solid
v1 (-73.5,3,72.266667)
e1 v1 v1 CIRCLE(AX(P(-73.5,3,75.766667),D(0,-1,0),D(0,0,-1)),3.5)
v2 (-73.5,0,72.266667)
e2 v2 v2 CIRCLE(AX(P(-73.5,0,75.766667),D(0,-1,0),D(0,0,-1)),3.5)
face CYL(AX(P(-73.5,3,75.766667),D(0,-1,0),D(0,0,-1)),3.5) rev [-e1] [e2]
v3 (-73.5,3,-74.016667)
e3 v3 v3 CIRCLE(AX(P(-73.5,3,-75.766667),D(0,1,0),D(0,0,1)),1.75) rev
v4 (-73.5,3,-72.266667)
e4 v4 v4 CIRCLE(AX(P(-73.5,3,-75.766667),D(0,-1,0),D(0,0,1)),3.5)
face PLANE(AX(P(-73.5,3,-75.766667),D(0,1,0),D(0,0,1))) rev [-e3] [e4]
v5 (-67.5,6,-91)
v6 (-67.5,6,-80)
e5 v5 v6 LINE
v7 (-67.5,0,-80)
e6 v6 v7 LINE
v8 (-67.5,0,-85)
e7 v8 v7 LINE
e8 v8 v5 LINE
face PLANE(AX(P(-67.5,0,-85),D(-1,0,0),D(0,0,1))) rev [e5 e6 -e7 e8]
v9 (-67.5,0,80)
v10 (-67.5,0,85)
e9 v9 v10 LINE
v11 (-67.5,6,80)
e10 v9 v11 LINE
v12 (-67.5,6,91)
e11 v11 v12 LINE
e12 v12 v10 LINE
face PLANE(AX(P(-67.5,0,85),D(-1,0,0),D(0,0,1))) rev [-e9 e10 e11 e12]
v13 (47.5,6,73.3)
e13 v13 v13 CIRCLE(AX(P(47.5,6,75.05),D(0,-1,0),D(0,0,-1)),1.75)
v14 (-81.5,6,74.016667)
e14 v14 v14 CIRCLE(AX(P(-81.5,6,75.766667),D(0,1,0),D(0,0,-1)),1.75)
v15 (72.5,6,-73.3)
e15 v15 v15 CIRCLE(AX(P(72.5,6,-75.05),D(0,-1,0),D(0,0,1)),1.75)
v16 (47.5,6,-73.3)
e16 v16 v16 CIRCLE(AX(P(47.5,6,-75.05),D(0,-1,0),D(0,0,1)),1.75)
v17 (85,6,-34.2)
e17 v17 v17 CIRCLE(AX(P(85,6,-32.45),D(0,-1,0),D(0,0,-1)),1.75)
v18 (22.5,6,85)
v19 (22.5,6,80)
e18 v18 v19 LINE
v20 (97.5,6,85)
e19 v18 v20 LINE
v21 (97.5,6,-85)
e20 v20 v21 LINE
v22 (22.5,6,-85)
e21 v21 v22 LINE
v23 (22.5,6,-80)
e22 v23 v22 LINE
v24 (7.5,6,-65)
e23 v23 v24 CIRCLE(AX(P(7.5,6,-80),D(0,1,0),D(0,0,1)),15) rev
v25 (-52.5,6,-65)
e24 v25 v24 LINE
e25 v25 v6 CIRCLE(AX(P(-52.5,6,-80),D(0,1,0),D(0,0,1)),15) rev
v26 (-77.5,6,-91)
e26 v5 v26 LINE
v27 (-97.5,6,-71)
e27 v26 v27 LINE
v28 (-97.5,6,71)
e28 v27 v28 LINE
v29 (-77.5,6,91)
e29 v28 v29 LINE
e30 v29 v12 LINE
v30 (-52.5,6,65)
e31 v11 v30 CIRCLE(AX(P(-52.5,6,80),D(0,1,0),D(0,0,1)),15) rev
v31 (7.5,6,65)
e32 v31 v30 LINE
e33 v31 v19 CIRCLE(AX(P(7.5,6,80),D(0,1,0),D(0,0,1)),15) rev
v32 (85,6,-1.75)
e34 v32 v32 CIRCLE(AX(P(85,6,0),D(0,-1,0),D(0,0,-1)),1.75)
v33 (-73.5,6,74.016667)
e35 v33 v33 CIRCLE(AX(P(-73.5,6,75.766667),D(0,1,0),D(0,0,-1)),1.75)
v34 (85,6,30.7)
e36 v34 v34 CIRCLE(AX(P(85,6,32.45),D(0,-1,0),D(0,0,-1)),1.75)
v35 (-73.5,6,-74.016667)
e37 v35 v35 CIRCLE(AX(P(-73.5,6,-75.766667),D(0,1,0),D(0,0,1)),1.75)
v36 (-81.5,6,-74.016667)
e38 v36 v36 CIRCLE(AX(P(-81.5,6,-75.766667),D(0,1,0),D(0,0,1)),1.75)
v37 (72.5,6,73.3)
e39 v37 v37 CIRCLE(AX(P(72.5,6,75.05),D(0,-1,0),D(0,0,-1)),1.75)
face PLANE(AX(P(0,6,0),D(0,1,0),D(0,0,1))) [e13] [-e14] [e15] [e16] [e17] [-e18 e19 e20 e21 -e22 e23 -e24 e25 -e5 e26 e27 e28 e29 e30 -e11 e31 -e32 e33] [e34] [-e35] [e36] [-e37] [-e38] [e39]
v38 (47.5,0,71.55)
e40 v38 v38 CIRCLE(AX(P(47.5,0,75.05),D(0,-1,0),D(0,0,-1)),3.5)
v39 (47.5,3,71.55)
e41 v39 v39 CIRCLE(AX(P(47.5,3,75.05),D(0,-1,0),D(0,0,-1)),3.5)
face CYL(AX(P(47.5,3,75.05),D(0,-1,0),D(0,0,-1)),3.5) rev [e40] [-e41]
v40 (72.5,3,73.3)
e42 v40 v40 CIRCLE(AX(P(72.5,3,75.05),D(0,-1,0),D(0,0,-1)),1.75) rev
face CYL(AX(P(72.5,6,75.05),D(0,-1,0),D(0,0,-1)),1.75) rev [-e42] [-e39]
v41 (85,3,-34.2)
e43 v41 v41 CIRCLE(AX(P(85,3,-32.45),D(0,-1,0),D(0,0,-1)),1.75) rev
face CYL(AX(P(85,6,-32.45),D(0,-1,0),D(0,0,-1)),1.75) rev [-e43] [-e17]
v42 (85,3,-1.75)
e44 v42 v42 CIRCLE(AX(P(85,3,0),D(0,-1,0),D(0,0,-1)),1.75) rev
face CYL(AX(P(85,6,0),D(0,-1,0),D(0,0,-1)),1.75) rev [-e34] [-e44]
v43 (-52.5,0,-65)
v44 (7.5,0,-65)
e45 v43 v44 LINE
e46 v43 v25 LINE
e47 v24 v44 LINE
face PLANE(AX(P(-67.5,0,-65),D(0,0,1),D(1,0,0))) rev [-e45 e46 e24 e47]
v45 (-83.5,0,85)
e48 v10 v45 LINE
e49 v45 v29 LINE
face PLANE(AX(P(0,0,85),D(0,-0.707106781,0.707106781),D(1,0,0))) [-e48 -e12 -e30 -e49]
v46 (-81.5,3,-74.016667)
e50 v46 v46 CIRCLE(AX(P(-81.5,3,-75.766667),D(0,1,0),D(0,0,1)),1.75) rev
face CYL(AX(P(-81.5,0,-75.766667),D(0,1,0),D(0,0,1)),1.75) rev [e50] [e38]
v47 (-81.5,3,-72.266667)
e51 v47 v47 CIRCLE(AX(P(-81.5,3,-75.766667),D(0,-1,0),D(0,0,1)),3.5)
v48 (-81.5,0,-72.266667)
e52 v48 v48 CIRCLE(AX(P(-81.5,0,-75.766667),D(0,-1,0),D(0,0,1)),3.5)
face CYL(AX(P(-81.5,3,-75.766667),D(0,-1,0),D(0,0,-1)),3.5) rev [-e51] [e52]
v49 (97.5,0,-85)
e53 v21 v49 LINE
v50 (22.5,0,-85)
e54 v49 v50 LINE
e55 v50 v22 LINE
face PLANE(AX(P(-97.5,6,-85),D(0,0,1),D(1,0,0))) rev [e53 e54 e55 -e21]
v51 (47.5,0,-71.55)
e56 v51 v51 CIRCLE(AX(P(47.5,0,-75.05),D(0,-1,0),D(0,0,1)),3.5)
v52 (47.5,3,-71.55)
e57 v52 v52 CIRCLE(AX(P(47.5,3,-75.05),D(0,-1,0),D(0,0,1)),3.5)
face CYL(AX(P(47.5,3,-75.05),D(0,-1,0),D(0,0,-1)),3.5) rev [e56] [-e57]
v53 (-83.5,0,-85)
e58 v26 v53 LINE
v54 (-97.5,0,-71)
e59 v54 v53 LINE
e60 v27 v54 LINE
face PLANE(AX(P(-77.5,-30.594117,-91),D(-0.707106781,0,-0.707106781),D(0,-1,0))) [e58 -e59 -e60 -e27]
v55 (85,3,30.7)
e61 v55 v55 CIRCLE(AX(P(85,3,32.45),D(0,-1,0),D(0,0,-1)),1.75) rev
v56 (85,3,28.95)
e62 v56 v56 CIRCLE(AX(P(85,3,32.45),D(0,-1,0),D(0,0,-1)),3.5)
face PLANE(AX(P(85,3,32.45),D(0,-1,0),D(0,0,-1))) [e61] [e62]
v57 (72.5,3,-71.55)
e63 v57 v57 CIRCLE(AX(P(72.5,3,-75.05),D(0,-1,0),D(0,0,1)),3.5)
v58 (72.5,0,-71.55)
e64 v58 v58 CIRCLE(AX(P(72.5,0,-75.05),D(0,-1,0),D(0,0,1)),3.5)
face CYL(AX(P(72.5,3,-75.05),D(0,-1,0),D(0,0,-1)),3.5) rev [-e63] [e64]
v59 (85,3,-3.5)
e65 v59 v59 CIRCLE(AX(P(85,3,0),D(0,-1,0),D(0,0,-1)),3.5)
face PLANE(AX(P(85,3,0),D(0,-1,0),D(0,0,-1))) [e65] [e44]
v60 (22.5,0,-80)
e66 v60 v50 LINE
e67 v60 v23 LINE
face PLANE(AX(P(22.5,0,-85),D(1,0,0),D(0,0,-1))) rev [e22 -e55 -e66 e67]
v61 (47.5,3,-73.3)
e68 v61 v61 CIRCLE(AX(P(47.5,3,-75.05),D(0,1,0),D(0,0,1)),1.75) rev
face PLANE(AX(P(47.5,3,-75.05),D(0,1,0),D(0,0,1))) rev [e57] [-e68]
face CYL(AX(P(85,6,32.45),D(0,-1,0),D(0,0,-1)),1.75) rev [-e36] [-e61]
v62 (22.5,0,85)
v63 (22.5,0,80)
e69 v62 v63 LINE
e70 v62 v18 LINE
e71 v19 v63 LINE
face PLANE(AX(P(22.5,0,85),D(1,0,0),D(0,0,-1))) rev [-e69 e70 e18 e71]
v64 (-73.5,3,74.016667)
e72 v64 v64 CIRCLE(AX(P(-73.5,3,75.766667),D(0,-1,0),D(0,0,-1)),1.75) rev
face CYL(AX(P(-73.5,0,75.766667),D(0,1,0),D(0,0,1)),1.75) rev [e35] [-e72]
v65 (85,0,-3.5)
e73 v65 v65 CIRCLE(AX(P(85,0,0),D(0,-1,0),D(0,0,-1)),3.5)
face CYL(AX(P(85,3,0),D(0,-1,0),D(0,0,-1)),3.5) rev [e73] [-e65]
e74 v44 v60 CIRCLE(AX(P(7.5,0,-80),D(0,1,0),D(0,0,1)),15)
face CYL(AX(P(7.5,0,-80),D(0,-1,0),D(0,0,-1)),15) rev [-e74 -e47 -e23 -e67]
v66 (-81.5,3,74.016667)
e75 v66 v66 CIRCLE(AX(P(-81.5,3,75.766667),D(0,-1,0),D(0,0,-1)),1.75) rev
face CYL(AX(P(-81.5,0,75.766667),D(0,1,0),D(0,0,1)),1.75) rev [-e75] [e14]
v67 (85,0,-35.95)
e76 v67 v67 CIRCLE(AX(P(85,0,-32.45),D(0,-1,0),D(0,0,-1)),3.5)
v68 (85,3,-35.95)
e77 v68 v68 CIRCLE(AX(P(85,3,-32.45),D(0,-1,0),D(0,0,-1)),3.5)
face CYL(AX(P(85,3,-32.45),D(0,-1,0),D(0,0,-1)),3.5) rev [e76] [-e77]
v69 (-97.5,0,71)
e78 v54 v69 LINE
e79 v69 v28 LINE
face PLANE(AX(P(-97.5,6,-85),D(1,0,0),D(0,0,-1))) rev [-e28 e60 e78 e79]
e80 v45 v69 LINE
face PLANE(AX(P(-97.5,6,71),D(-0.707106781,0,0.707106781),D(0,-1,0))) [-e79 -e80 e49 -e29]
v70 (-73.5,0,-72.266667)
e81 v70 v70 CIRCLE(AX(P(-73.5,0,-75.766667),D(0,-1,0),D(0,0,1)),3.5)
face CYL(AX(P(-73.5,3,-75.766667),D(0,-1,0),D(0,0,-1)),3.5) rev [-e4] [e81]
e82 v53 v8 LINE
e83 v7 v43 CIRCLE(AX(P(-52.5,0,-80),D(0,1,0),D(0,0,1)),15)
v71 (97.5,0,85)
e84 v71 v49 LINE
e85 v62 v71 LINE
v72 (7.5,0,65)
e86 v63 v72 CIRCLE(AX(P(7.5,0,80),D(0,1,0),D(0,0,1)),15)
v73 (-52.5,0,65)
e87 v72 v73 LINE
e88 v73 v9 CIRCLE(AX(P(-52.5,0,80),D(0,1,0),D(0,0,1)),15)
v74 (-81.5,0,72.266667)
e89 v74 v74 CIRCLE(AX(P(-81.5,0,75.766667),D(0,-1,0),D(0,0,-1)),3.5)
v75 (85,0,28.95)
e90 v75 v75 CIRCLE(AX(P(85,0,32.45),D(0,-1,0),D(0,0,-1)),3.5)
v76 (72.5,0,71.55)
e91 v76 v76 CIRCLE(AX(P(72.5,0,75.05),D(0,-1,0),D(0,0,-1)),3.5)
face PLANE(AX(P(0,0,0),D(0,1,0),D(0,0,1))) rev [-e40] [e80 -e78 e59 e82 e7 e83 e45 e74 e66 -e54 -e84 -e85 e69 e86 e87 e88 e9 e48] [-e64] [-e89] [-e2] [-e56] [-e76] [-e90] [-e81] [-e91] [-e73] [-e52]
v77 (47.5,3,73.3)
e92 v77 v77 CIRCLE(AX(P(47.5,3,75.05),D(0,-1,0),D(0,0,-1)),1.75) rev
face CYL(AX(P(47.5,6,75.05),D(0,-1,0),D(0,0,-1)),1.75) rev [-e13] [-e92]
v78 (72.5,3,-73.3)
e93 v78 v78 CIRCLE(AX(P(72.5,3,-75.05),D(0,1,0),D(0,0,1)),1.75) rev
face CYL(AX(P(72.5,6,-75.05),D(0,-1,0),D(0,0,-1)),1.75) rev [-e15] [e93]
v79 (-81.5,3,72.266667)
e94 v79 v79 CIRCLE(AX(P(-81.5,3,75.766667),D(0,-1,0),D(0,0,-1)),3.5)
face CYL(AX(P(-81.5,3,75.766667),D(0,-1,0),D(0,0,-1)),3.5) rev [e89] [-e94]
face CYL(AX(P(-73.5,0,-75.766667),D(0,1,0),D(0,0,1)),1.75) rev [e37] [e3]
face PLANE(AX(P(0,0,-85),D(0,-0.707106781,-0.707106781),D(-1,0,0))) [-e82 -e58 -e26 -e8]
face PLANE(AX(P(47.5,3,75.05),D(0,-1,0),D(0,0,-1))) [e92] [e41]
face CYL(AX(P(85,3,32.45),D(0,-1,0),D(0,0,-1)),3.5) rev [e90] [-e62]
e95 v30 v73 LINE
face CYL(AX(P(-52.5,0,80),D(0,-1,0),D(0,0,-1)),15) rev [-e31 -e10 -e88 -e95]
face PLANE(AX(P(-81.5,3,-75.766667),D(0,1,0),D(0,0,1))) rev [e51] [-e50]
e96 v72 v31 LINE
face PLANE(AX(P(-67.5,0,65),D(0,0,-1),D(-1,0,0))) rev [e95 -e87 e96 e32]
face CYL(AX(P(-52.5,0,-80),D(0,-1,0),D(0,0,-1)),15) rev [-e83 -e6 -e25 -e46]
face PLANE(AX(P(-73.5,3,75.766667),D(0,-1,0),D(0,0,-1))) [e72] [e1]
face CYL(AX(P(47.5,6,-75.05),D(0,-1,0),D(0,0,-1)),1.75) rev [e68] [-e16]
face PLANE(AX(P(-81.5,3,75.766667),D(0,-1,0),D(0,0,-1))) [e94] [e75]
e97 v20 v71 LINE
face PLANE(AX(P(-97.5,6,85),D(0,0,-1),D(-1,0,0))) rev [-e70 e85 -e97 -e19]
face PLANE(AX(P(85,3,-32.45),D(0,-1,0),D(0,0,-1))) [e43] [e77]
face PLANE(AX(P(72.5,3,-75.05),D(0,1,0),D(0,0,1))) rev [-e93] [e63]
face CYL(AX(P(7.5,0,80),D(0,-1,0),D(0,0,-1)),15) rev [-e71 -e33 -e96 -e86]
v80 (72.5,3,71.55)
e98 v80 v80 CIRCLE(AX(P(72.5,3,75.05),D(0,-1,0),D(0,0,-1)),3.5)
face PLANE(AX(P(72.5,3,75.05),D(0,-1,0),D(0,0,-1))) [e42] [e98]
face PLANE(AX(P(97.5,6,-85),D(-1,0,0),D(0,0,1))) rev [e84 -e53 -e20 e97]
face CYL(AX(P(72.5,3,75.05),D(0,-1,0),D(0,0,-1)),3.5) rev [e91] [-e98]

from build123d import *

# Parameters (mm, degrees)
SKETCH1_W           = 195
SKETCH1_H           = 170
BOSS_EXTRUDE1_DEPTH = 6
SKETCH2_W           = 90
SKETCH2_H           = 20
CUT_EXTRUDE1_DEPTH  = 130.48841647
FILLET1_R           = 15
SKETCH3_W           = 30
SKETCH3_H           = 6
BOSS_EXTRUDE2_DEPTH = 6
CHAMFER1_SIZE       = 20
SKETCH4_R           = 1.75
CUT_EXTRUDE2_DEPTH  = 134.503745266
SKETCH7_R           = 1.75
CUT_EXTRUDE5_DEPTH  = 134.503745266
SKETCH8_R           = 1.75
CUT_EXTRUDE6_DEPTH  = 134.503745266
SKETCH6_R           = 3.5
CUT_EXTRUDE4_DEPTH  = 3
CHAMFER3_SIZE       = 6


with BuildPart() as part:
    # Sketch1 → Boss-Extrude1 (new body)
    with BuildSketch(Plane(origin=(0, 0, 0), x_dir=(1, 0, 0), z_dir=(0, 1, 0))):
        Rectangle(SKETCH1_W, SKETCH1_H)
    extrude(amount=BOSS_EXTRUDE1_DEPTH)

    # Sketch2 → Cut-Extrude1 (cut, through all)
    with BuildSketch(Plane(origin=(0, 6, 0), x_dir=(1, 0, 0), z_dir=(0, 1, 0))):
        with Locations((-22.5, -75)):
            Rectangle(SKETCH2_W, SKETCH2_H)
        with Locations((-22.5, 75)):
            Rectangle(SKETCH2_W, SKETCH2_H)
    extrude(amount=-CUT_EXTRUDE1_DEPTH, mode=Mode.SUBTRACT)

    # Fillet1
    fillet1_edges = [part.edges().sort_by_distance(p)[0] for p in [
        (-67.5, 3, 65),
        (22.5, 3, 65),
        (-67.5, 3, -65),
        (22.5, 3, -65),
    ]]
    fillet(fillet1_edges, radius=FILLET1_R)

    # Sketch3 → Boss-Extrude2 (add)
    with BuildSketch(Plane(origin=(0, 6, 0), x_dir=(1, 0, 0), z_dir=(0, 1, 0))):
        with Locations((-82.5, 88)):
            Rectangle(SKETCH3_W, SKETCH3_H)
        with Locations((-82.5, -88)):
            Rectangle(SKETCH3_W, SKETCH3_H)
    extrude(amount=-BOSS_EXTRUDE2_DEPTH)

    # Chamfer1
    chamfer1_edges = [part.edges().sort_by_distance(p)[0] for p in [
        (-97.5, 3, -91),
        (-97.5, 3, 91),
    ]]
    chamfer(chamfer1_edges, length=CHAMFER1_SIZE)

    # Sketch4 → Cut-Extrude2 (cut, through all)
    with BuildSketch(Plane(origin=(0, 6, 0), x_dir=(1, 0, 0), z_dir=(0, 1, 0))):
        with Locations(Location((-81.5, 75.766666667, 0), (0, 0, 270))):
            Circle(SKETCH4_R)
        with Locations(Location((-81.5, -75.766666667, 0), (0, 0, 90))):
            Circle(SKETCH4_R)
        with Locations(Location((-73.5, 75.766666667, 0), (0, 0, 270))):
            Circle(SKETCH4_R)
        with Locations(Location((-73.5, -75.766666667, 0), (0, 0, 90))):
            Circle(SKETCH4_R)
    extrude(amount=-CUT_EXTRUDE2_DEPTH, mode=Mode.SUBTRACT)

    # Sketch7 → Cut-Extrude5 (cut, through all)
    with BuildSketch(Plane.XZ):
        with Locations(Location((47.5, 75.05, 0), (0, 0, 270))):
            Circle(SKETCH7_R)
        with Locations(Location((72.5, 75.05, 0), (0, 0, 270))):
            Circle(SKETCH7_R)
        with Locations(Location((72.5, -75.05, 0), (0, 0, 90))):
            Circle(SKETCH7_R)
        with Locations(Location((47.5, -75.05, 0), (0, 0, 90))):
            Circle(SKETCH7_R)
    extrude(amount=-CUT_EXTRUDE5_DEPTH, mode=Mode.SUBTRACT)

    # Sketch8 → Cut-Extrude6 (cut, through all)
    with BuildSketch(Plane.XZ):
        with Locations(Location((85, 32.45, 0), (0, 0, 270))):
            Circle(SKETCH8_R)
        with Locations(Location((85, 0, 0), (0, 0, 270))):
            Circle(SKETCH8_R)
        with Locations(Location((85, -32.45, 0), (0, 0, 270))):
            Circle(SKETCH8_R)
    extrude(amount=-CUT_EXTRUDE6_DEPTH, mode=Mode.SUBTRACT)

    # Sketch6 → Cut-Extrude4 (cut)
    with BuildSketch(Plane.XZ):
        with Locations(Location((-73.5, 75.766666667, 0), (0, 0, 270))):
            Circle(SKETCH6_R)
        with Locations(Location((-81.5, 75.766666667, 0), (0, 0, 270))):
            Circle(SKETCH6_R)
        with Locations(Location((-73.5, -75.766666667, 0), (0, 0, 90))):
            Circle(SKETCH6_R)
        with Locations(Location((-81.5, -75.766666667, 0), (0, 0, 90))):
            Circle(SKETCH6_R)
        with Locations(Location((47.5, 75.05, 0), (0, 0, 270))):
            Circle(SKETCH6_R)
        with Locations(Location((72.5, 75.05, 0), (0, 0, 270))):
            Circle(SKETCH6_R)
        with Locations(Location((47.5, -75.05, 0), (0, 0, 90))):
            Circle(SKETCH6_R)
        with Locations(Location((72.5, -75.05, 0), (0, 0, 90))):
            Circle(SKETCH6_R)
        with Locations(Location((85, 32.45, 0), (0, 0, 270))):
            Circle(SKETCH6_R)
        with Locations(Location((85, 0, 0), (0, 0, 270))):
            Circle(SKETCH6_R)
        with Locations(Location((85, -32.45, 0), (0, 0, 270))):
            Circle(SKETCH6_R)
    extrude(amount=-CUT_EXTRUDE4_DEPTH, mode=Mode.SUBTRACT)

    # Chamfer3
    chamfer3_edges = [part.edges().sort_by_distance(p)[0] for p in [
        (-72.5, 0, -91),
        (-72.5, 0, 91),
    ]]
    chamfer(chamfer3_edges, length=CHAMFER3_SIZE - 0.0001)  # a hair under: the kernel refuses the full size


solid = part.part
